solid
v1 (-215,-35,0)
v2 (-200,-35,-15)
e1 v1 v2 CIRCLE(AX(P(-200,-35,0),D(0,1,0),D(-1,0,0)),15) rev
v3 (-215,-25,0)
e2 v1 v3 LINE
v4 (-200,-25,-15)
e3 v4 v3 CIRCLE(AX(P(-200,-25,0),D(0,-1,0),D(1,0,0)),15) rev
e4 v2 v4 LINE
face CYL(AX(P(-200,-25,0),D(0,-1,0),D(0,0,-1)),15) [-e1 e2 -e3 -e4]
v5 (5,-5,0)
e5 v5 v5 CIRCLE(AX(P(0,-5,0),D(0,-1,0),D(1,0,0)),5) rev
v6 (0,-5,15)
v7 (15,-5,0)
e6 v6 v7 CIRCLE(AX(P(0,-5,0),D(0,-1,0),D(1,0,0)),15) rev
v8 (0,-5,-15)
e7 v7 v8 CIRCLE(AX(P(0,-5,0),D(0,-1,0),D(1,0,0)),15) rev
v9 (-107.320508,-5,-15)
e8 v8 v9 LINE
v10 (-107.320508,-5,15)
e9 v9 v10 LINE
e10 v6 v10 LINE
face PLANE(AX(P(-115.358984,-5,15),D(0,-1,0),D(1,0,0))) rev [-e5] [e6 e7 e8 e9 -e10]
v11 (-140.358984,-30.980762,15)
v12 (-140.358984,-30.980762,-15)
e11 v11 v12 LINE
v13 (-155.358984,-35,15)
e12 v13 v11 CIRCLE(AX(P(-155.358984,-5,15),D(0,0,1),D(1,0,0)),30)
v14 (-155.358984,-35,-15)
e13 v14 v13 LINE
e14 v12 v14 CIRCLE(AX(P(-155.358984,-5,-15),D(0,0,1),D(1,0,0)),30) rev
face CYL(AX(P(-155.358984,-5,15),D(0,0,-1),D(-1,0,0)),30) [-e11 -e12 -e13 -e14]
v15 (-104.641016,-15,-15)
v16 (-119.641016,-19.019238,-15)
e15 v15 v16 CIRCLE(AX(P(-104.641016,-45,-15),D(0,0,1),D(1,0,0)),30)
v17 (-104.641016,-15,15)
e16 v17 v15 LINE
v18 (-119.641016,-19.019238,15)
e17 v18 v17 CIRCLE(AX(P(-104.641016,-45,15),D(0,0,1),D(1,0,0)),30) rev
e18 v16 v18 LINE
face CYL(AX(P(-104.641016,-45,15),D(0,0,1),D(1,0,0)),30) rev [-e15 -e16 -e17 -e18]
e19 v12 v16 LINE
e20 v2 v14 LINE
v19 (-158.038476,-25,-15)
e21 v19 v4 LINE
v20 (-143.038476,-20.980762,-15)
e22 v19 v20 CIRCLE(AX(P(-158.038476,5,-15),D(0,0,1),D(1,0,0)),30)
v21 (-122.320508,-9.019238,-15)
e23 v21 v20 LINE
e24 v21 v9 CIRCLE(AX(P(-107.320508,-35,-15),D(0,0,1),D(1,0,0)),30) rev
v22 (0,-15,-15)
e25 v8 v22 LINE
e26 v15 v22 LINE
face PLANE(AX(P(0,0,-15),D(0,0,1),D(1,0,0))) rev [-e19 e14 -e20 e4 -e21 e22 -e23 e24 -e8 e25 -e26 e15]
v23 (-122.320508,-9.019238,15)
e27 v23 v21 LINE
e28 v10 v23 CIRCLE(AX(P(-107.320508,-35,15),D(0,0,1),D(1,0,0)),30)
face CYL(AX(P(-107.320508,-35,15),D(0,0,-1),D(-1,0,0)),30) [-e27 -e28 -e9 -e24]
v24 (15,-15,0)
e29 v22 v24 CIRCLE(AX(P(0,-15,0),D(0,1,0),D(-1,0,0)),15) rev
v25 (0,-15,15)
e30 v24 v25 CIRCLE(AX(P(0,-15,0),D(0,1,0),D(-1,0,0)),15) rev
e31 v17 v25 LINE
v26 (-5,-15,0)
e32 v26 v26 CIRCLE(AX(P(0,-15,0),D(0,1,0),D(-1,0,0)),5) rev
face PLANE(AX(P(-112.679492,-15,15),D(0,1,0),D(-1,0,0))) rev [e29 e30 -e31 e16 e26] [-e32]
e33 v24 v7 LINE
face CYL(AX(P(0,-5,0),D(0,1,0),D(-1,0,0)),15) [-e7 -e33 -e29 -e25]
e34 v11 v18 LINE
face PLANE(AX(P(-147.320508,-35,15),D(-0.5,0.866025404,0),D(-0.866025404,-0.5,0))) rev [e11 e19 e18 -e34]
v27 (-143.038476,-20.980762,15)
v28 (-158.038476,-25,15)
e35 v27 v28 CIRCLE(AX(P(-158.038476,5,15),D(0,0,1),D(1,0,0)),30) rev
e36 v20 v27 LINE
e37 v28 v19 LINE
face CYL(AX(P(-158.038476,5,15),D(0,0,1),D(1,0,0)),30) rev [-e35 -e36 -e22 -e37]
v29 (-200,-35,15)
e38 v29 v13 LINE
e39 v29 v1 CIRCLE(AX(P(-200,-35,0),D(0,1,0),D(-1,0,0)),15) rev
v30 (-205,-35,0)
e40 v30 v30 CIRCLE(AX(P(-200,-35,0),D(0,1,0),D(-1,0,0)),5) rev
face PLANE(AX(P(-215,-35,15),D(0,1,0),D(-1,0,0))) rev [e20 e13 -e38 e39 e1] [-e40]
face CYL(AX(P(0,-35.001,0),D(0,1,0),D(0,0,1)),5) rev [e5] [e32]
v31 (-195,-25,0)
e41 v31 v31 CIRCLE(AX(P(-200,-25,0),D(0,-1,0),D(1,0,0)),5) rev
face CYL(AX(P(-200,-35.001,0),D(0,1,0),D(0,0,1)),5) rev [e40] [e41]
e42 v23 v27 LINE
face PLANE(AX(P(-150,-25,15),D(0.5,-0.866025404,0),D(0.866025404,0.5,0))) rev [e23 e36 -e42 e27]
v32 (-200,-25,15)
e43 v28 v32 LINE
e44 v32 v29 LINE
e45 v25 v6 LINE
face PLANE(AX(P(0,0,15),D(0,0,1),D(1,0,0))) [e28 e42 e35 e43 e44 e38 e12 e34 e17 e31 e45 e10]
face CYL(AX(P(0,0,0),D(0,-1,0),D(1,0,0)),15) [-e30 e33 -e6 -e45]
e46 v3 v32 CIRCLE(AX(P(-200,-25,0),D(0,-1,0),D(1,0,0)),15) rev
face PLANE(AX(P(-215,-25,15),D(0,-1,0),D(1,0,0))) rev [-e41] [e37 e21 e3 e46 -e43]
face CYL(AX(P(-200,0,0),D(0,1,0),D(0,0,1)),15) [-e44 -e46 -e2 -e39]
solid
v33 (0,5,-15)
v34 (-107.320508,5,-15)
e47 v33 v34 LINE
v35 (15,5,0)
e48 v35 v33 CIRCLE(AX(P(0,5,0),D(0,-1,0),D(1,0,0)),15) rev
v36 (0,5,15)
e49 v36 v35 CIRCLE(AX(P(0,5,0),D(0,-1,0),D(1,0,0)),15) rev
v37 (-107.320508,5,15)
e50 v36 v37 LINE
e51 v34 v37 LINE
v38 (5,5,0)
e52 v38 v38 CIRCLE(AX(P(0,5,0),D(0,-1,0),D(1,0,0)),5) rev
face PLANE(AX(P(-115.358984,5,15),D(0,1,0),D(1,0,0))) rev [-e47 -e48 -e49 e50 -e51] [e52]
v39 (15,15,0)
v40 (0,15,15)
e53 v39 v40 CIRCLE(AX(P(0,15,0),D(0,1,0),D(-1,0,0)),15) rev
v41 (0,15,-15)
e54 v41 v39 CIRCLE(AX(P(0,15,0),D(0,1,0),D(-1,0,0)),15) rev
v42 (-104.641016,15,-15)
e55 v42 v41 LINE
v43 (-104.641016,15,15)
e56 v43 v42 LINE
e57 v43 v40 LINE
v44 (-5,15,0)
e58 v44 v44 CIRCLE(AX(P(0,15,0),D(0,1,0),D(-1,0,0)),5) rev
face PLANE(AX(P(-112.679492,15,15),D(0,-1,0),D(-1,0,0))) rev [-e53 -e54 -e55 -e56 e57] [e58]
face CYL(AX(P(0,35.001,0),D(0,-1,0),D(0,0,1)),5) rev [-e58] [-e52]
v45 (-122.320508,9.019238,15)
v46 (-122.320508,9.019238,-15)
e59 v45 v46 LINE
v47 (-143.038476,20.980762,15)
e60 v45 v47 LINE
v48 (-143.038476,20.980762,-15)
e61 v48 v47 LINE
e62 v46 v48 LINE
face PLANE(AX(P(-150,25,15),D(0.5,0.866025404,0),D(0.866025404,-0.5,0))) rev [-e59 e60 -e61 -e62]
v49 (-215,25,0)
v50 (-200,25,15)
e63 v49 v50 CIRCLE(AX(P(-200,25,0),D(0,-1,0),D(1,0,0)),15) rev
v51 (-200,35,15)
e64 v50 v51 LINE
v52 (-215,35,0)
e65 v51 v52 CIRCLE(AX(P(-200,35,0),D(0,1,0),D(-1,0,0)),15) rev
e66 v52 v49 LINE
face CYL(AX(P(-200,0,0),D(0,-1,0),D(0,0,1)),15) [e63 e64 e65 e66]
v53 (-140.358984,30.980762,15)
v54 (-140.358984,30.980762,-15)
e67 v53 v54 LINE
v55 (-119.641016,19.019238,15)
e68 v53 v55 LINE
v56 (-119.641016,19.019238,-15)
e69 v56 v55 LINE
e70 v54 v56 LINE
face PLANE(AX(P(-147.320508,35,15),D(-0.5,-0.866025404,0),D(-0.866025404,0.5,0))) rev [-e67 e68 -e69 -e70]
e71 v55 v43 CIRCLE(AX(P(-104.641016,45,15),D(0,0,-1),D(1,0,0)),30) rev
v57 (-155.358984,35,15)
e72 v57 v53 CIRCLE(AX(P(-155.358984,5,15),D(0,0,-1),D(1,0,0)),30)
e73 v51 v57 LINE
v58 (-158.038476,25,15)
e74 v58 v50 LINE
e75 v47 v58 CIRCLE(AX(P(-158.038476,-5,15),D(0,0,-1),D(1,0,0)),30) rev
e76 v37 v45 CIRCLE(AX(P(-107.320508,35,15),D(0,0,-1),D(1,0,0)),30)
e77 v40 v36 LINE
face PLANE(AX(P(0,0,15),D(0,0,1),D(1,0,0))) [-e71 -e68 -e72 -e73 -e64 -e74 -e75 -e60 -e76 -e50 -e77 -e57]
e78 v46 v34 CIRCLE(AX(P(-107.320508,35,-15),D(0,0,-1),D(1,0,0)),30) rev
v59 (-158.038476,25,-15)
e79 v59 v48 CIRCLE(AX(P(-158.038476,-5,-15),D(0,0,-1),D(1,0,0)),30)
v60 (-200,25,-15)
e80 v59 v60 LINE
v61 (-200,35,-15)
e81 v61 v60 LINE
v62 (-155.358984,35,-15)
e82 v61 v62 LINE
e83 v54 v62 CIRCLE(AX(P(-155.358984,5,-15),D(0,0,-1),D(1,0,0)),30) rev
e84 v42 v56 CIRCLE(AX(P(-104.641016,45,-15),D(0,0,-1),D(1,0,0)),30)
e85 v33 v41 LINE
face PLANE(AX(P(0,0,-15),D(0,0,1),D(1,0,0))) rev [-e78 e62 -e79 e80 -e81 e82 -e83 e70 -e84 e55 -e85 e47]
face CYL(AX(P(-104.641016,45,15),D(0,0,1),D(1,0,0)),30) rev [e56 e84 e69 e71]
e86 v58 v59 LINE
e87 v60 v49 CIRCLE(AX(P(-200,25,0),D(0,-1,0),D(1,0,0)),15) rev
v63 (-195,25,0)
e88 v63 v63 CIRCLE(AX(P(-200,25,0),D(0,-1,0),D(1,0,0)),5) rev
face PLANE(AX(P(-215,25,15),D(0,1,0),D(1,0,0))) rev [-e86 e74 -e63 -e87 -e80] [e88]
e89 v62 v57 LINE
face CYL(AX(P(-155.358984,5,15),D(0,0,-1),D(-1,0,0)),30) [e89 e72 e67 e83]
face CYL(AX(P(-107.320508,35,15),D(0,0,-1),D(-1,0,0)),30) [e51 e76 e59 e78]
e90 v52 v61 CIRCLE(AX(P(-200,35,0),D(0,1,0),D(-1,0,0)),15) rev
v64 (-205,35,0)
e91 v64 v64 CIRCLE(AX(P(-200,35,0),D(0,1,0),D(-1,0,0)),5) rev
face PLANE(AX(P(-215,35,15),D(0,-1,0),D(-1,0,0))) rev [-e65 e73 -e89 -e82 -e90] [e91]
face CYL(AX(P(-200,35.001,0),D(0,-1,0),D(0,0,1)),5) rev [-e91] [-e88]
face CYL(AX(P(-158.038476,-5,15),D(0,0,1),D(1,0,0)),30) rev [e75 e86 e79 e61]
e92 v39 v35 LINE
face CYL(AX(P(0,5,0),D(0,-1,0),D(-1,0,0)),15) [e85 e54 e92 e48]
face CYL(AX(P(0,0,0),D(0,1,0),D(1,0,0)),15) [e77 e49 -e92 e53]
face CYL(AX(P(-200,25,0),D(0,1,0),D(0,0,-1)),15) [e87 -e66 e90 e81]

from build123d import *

# Parameters (mm, degrees)
SALIENTE_EXTRUIR1_DEPTH = 15
REDONDEO3_R             = 15
REDONDEO2_R             = 30
CORTAR_EXTRUIR1_REACH   = 220.346
CROQUIS4_R              = 5


with BuildPart() as part:
    # Croquis3 → Saliente-Extruir1 (new, symmetric)
    with BuildSketch(Plane(origin=(0, 0, 0), x_dir=(0, 1, 0), z_dir=(0, 0, 1))):
        Polygon((-25, 215), (-25, 150), (-5, 115.358983849), (-5, -15), (-15, -15), (-15, 112.679491924), (-35, 147.320508076), (-35, 215), align=None)
    extrude(amount=SALIENTE_EXTRUIR1_DEPTH, both=True)

    # Redondeo3
    redondeo3_edges = [part.edges().sort_by_distance(p)[0] for p in [
        (15, -10, 15),
        (15, -10, -15),
        (-215, -30, -15),
        (-215, -30, 15),
    ]]
    fillet(redondeo3_edges, radius=REDONDEO3_R - 0.0001)  # a hair under: the kernel refuses the full size

    # Redondeo2
    redondeo2_edges = [part.edges().sort_by_distance(p)[0] for p in [
        (-150, -25, 0),
        (-115.358983849, -5, 0),
        (-112.679491924, -15, 0),
        (-147.320508076, -35, 0),
    ]]
    fillet(redondeo2_edges, radius=REDONDEO2_R)

    # Croquis4 → Cortar-Extruir1 (cut, up to next)
    with BuildSketch(Plane(origin=(0, 0, 0), x_dir=(-1, 0, 0), z_dir=(0, 1, 0)), mode=Mode.PRIVATE) as cortar_extruir1_sk1:
        with Locations(Location((0, 0, 0), (0, 0, 180))):
            Circle(CROQUIS4_R)
    cortar_extruir1_tool1 = extrude(cortar_extruir1_sk1.sketch, amount=-CORTAR_EXTRUIR1_REACH, mode=Mode.PRIVATE) & part.part
    # Croquis4 → Cortar-Extruir1 (cut, up to next)
    with BuildSketch(Plane(origin=(0, 0, 0), x_dir=(-1, 0, 0), z_dir=(0, 1, 0)), mode=Mode.PRIVATE) as cortar_extruir1_sk2:
        with Locations(Location((200, 0, 0), (0, 0, 180))):
            Circle(CROQUIS4_R)
    cortar_extruir1_tool2 = extrude(cortar_extruir1_sk2.sketch, amount=-CORTAR_EXTRUIR1_REACH, mode=Mode.PRIVATE) & part.part
    add(cortar_extruir1_tool1.solids().sort_by_distance((0, 0, 0))[0], mode=Mode.SUBTRACT)
    add(cortar_extruir1_tool2.solids().sort_by_distance((-200, 0, 0))[0], mode=Mode.SUBTRACT)


with BuildPart() as body_2:
    # Simetría2: mirrored copy
    add(part.part.mirror(Plane.ZX))


solid = Compound([part.part, body_2.part])
